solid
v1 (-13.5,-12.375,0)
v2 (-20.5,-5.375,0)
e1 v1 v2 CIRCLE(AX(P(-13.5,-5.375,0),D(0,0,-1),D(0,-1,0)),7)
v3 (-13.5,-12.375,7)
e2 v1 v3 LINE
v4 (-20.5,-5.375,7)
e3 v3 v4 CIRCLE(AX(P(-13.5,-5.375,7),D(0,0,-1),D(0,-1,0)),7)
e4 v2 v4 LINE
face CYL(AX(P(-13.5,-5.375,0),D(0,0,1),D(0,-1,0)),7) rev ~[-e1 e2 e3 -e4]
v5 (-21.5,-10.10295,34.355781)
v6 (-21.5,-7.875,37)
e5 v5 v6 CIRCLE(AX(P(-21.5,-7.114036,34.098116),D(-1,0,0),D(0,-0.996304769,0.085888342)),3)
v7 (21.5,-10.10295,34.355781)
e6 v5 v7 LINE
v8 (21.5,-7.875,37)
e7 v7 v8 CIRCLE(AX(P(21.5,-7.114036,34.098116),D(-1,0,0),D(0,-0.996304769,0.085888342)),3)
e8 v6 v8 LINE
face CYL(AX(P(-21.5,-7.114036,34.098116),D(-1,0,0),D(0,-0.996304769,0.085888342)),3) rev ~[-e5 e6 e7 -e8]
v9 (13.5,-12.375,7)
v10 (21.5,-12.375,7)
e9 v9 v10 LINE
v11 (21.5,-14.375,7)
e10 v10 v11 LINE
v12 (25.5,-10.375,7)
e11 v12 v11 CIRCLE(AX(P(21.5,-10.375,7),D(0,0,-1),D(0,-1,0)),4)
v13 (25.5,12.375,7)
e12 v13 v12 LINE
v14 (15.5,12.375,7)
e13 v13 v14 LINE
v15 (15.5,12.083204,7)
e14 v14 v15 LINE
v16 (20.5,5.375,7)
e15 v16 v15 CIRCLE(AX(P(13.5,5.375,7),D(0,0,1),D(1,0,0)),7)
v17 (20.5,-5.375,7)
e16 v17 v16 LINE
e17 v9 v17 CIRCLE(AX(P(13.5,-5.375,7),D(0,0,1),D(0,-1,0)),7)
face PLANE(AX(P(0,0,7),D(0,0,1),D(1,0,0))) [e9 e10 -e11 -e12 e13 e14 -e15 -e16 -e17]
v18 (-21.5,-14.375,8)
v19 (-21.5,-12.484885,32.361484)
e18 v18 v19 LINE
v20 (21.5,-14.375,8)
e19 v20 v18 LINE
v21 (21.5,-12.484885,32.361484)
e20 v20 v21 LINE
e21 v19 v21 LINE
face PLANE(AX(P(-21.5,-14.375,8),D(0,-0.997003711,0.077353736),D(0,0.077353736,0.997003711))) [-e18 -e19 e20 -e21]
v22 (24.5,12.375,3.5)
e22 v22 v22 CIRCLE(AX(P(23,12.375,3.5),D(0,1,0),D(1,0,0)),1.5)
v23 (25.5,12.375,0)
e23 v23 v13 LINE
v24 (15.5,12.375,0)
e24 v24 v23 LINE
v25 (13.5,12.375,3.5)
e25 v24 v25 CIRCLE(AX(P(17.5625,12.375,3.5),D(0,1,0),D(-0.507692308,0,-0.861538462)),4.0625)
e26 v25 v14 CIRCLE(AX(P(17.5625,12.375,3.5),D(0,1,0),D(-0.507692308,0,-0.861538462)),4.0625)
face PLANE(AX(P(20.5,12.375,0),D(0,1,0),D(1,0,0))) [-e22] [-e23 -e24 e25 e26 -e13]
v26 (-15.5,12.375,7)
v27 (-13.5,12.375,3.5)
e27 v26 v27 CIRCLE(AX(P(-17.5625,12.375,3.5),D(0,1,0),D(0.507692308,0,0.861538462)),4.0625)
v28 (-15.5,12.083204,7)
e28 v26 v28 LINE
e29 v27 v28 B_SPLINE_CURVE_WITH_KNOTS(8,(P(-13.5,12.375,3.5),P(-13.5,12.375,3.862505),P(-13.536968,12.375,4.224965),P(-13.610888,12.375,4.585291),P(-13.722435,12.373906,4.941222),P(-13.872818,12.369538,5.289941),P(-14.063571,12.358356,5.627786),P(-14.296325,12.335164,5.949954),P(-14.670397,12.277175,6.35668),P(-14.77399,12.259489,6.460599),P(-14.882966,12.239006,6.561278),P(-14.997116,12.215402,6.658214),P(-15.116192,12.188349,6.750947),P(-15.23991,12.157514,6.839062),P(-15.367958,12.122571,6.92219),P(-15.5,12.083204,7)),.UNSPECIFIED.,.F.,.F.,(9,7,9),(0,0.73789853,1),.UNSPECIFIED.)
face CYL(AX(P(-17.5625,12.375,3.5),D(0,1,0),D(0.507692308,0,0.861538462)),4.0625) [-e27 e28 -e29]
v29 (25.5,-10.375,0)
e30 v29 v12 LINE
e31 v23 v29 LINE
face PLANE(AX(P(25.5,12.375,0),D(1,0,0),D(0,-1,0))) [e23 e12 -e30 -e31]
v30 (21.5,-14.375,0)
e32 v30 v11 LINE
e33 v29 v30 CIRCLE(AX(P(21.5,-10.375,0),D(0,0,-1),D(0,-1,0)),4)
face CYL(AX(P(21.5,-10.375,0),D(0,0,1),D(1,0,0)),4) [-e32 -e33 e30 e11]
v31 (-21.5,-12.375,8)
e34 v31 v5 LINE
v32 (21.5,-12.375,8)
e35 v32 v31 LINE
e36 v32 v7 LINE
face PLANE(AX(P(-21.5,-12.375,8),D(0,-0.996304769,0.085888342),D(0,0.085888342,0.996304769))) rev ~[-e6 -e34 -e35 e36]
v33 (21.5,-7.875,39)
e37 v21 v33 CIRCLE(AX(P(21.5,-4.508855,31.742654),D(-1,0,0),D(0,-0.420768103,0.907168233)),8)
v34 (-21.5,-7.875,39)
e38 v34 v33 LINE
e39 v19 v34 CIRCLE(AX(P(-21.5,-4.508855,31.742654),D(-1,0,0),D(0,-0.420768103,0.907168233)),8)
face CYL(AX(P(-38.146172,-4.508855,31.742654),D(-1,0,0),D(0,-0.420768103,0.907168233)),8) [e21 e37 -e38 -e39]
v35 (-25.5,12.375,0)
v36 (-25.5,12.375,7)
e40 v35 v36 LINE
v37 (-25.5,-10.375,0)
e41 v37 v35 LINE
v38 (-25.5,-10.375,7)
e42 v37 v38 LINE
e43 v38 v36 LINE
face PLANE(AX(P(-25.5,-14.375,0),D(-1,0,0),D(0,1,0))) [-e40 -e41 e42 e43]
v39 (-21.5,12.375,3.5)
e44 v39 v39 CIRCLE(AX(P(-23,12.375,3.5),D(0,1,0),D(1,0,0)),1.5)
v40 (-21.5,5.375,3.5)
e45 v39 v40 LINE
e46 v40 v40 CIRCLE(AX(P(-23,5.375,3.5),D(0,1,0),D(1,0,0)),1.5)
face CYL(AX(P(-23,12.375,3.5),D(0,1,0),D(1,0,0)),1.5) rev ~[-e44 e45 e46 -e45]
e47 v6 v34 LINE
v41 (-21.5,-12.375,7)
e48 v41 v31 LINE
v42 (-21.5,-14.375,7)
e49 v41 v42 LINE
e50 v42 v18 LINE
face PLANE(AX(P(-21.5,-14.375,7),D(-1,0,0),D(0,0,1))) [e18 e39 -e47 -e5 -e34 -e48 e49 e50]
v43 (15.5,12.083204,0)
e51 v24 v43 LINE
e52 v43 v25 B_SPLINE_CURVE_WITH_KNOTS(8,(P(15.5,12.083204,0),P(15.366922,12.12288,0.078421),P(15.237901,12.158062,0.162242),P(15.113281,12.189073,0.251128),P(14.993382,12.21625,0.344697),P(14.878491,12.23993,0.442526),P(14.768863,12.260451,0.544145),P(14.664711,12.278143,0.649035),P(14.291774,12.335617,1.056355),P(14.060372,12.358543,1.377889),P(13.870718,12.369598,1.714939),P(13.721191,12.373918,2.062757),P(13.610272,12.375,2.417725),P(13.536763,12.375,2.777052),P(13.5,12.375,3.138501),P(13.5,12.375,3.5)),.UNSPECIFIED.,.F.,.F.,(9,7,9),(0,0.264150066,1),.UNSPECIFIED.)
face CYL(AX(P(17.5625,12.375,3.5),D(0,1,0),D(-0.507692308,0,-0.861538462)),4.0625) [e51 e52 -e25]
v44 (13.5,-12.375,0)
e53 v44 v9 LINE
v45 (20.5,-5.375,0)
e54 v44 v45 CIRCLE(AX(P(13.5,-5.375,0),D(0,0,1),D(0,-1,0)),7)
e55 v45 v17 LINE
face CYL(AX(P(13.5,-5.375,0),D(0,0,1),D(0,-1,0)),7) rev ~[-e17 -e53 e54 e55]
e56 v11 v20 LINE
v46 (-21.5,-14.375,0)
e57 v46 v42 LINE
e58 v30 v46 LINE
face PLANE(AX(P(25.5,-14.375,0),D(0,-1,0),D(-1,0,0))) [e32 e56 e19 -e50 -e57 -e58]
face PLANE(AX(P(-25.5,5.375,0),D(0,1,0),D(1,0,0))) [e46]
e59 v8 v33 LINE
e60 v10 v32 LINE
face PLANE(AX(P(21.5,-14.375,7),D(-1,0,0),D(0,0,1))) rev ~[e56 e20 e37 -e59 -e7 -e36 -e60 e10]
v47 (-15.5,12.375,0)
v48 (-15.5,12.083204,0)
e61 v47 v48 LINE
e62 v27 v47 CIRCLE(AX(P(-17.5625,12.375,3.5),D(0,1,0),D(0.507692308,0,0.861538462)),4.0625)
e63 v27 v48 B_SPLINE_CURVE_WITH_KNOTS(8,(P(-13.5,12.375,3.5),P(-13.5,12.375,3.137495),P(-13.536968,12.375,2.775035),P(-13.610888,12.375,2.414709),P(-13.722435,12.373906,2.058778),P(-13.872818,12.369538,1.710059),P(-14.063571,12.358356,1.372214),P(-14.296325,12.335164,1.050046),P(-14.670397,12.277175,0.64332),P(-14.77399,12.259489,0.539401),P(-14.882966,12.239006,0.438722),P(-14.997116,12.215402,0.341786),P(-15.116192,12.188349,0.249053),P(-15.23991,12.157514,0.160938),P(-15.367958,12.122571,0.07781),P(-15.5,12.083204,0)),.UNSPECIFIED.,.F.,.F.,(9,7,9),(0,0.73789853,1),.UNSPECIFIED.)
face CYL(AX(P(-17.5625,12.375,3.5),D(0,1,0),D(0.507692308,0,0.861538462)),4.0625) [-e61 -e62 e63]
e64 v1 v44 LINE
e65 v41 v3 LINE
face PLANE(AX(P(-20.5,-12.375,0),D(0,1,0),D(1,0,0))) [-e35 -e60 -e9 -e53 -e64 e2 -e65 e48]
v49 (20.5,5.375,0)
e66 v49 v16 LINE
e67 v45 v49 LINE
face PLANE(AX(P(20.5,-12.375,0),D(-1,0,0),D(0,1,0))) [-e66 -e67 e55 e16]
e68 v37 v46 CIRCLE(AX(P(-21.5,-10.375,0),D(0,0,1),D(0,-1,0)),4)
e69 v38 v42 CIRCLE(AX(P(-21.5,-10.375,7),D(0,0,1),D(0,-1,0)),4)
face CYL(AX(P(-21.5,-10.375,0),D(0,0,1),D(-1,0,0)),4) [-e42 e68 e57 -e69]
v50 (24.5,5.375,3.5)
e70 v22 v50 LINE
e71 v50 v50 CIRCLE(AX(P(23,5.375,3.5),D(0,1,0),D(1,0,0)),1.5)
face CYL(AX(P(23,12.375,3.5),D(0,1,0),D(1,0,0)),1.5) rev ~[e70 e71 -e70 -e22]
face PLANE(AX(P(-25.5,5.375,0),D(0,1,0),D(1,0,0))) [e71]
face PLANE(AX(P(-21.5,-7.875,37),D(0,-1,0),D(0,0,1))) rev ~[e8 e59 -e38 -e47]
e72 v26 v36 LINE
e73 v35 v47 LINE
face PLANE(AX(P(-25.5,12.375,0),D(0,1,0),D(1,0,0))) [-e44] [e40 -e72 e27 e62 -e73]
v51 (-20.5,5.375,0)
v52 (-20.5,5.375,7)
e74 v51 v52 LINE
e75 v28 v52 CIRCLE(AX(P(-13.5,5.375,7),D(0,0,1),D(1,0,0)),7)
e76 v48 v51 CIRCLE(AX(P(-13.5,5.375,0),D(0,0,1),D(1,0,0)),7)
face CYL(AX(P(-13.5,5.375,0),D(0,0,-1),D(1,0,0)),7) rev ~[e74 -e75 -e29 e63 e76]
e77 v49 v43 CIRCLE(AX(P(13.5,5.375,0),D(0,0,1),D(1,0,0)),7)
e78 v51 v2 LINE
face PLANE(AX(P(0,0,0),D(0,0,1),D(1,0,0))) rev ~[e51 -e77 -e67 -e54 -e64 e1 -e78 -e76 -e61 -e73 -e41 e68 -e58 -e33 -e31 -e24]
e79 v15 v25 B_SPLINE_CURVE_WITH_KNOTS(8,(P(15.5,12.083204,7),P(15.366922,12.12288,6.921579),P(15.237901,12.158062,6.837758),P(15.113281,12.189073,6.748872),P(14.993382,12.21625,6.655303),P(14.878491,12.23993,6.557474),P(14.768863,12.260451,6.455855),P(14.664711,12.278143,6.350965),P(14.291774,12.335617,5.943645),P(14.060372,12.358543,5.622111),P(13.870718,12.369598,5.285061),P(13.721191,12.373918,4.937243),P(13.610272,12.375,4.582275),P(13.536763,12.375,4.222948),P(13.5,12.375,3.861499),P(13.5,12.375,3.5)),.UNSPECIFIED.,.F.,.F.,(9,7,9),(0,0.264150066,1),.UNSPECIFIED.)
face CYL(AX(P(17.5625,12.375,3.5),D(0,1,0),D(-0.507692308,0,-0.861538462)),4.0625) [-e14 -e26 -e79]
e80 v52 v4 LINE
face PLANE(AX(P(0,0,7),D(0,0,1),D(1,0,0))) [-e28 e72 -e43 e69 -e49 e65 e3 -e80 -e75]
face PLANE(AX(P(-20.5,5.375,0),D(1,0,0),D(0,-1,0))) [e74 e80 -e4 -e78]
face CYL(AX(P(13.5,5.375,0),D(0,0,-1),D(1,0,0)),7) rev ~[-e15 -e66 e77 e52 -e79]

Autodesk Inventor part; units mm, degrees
ref_plane "YZ Plane" through (0, 0, 0) normal (1, 0, 0) x (0, 1, 0)
ref_plane "XZ Plane" through (0, 0, 0) normal (0, 1, 0) x (-1, 0, 0)
ref_plane "XY Plane" through (0, 0, 0) normal (0, 0, 1) x (1, 0, 0)
sketch "Sketch1" plane through (0, 0, 0) normal (0, 0, 1) x (1, 0, 0)
  line L0 (-20.5, -12.375) -> (20.5, -12.375)
  line L1 (20.5, -12.375) -> (20.5, 12.375)
  line L2 (20.5, 12.375) -> (-20.5, 12.375)
  line L3 (-20.5, 12.375) -> (-20.5, -12.375)
  line L4 (-20.5, -12.375) -> (20.5, 12.375) construction
  line L5 (20.5, -12.375) -> (-20.5, 12.375) construction
  line L6 (-20.5, 12.375) -> (-25.5, 12.375) construction
  line L7 (20.5, 12.375) -> (25.5, 12.375) construction
  line L8 (20.5, -12.375) -> (25.5, -12.375) construction
  line L9 (25.5, -12.375) -> (25.5, -14.375) construction
  line L10 (-25.5, 12.375) -> (25.5, 12.375)
  line L11 (25.5, 12.375) -> (25.5, -14.375)
  line L12 (25.5, -14.375) -> (-25.5, -14.375)
  line L13 (-25.5, -14.375) -> (-25.5, 12.375)
  line L14 (-20.5, 12.375) -> (-13.5, 12.375)
  line L15 (20.5, 12.375) -> (13.5, 12.375)
  line L16 (13.5, 12.375) -> (13.5, 5.375) construction
  line L17 (-13.5, 12.375) -> (-13.5, 5.375) construction
  circle A0 centre (-13.5, 5.375) radius 7
  circle A1 centre (13.5, 5.375) radius 7
  point P0 (0, 0)
  point P1 (-20.5, 5.375)
  point P2 (20.5, 12.375)
  point P3 (20.5, 5.375)
  dimension "d0" = 41
  dimension "d3" = 24.75
  dimension "d4" = 5
  dimension "d5" = 5
  dimension "d6" = 5
  dimension "d7" = 2
  dimension "d8" = 7
  dimension "d9" = 7
  dimension "d10" = 7
  dimension "d11" = 7
extrude "Extrusion1" add sketch "Sketch1" along normal blind 7 contours L0 L1 L10 L11 L12 L13 L3 | L3 L2 A0 | A1 L2 L1
fillet "Fillet1" radius 7 2 edges at (-20.5, -12.375, 3.5) (20.5, -12.375, 3.5)
fillet "Fillet2" radius 4 2 edges at (-25.5, -14.375, 3.5) (25.5, -14.375, 3.5)
sketch "Sketch2" plane through (-25.5, 12.375, 0) normal (0, 1, 0) x (1, 0, 0)
  line L0 (0, 0) -> (2.5, 0) construction
  line L1 (12, 0) -> (0, 0) construction
  line L2 (2.5, 0) -> (2.5, -3.5) construction
  line L3 (12, -7) -> (0, -7) construction
  circle A0 centre (2.5, -3.5) radius 1.5
  line L4 (51, 0) -> (51, -7) construction
  line L5 (51, 0) -> (48.5, 0) construction
  line L6 (51, 0) -> (39, 0) construction
  line L7 (48.5, 0) -> (48.5, -3.5) construction
  circle A1 centre (48.5, -3.5) radius 1.5
  point P0 (25.5, 0)
  dimension "d16" = 2.5
  dimension "d17" = 3.5
  dimension "d18" = 3
  dimension "d19" = 2.5
  dimension "d20" = 3.5
  dimension "d21" = 3
extrude "Extrusion2" cut sketch "Sketch2" against normal blind 7
sketch "Sketch3" plane through (0, 0, 7) normal (0, 0, 1) x (1, 0, 0)
  arc A0 (-20.5, -5.375) -> (-13.5, -12.375) centre (-13.5, -5.375) ccw projected
  arc A1 (-25.5, -10.375) -> (-21.5, -14.375) centre (-21.5, -10.375) ccw projected
  line L0 (-13.5, -12.375) -> (-21.5, -12.375)
  line L1 (-21.5, -12.375) -> (-21.5, -14.375)
  line L2 (-21.5, -14.375) -> (-13.5, -14.375)
  line L3 (-13.5, -14.375) -> (-13.5, -12.375)
  line L4 (13.5, -12.375) -> (-13.5, -12.375) projected
  line L5 (-21.5, -14.375) -> (21.5, -14.375) projected
  line L6 (13.5, -12.375) -> (21.5, -12.375)
  line L7 (21.5, -12.375) -> (21.5, -14.375)
  line L8 (21.5, -14.375) -> (13.5, -14.375)
  line L9 (13.5, -14.375) -> (13.5, -12.375)
  line L10 (-13.5, -12.375) -> (13.5, -12.375)
  line L11 (13.5, -12.375) -> (13.5, -14.375)
  line L12 (13.5, -14.375) -> (-13.5, -14.375)
  line L13 (-13.5, -14.375) -> (-13.5, -12.375)
  point P0 (0, 0)
  dimension "d24" = 8
extrude "Extrusion3" add sketch "Sketch3" along normal blind 1
sketch "Sketch7" plane through (-21.5, -14.375, 7) normal (-1, 0, 0) x (0, 0, 1)
  line L0 (1, 0) -> (30, 0) construction
  line L1 (30, 0) -> (30, 4.5) construction
  line L2 (1, 2) -> (30, 4.5)
  line L3 (1, 0) -> (30, 2.25)
  line L4 (30, 4.5) -> (30, 6.5)
  line L5 (30, 6.5) -> (32, 6.5)
  line L6 (32, 6.5) -> (32, 2.4052)
  line L7 (32, 2.4052) -> (30, 2.25)
  line L8 (1, 0) -> (1, 2)
  point P0 (-7, 14.375)
  dimension "d42" = 29
  dimension "d43" = 4.5
  dimension "d44" = 2
  dimension "d45" = 2
extrude "Extrusion6" add sketch "Sketch7" against normal up to surface (43 mm away)
fillet "Fillet3" radius 8 1 edges at (0, -11.9698, 39)
fillet "Fillet4" radius 3 1 edges at (0, -9.875, 37)
sketch "Sketch8" plane through (-25.5, 12.375, 0) normal (0, 1, 0) x (1, 0, 0)
  line L0 (0, 0) -> (0, -7) projected
  line L1 (39, 0) -> (12, 0) projected
  line L2 (0, -7) -> (12, -7)
  line L3 (12, -7) -> (12, 0)
  line L4 (12, 0) -> (0, 0)
  line L5 (0, 0) -> (0, -7)
  line L6 (39, 0) -> (39, -7) projected
  line L7 (51, 0) -> (51, -7) projected
  line L8 (39, 0) -> (51, 0)
  line L9 (51, 0) -> (51, -7)
  line L10 (51, -7) -> (39, -7)
  line L11 (39, -7) -> (39, 0)
  circle A0 centre (48.5, -3.5) radius 1.5 projected
  circle A1 centre (48.5, -3.5) radius 1.5
  circle A2 centre (2.5, -3.5) radius 1.5 projected
  circle A3 centre (2.5, -3.5) radius 1.5
  line L12 (12, -7) -> (10, -7) construction
  line L13 (10, -7) -> (10, 0) construction
  line L14 (39, -7) -> (41, -7) construction
  line L15 (41, -7) -> (41, 0) construction
  arc A4 (10, -7) -> (10, 0) centre (7.9375, -3.5) ccw
  arc A5 (41, 0) -> (41, -7) centre (43.0625, -3.5) ccw
  point P0 (25.5, 0)
  point P1 (39, -3.5)
  point P2 (12, -3.5)
  dimension "d52" = 2
  dimension "d53" = 2
  dimension "d54" = 3
  dimension "d55" = 3
extrude "Extrusion7" cut sketch "Sketch8" against normal blind 1 contours L4 L3 A4 | A4 L3 L2 | L8 A5 L6 | A5 L10 L6
properties part number "SAW_clamp_sled"
